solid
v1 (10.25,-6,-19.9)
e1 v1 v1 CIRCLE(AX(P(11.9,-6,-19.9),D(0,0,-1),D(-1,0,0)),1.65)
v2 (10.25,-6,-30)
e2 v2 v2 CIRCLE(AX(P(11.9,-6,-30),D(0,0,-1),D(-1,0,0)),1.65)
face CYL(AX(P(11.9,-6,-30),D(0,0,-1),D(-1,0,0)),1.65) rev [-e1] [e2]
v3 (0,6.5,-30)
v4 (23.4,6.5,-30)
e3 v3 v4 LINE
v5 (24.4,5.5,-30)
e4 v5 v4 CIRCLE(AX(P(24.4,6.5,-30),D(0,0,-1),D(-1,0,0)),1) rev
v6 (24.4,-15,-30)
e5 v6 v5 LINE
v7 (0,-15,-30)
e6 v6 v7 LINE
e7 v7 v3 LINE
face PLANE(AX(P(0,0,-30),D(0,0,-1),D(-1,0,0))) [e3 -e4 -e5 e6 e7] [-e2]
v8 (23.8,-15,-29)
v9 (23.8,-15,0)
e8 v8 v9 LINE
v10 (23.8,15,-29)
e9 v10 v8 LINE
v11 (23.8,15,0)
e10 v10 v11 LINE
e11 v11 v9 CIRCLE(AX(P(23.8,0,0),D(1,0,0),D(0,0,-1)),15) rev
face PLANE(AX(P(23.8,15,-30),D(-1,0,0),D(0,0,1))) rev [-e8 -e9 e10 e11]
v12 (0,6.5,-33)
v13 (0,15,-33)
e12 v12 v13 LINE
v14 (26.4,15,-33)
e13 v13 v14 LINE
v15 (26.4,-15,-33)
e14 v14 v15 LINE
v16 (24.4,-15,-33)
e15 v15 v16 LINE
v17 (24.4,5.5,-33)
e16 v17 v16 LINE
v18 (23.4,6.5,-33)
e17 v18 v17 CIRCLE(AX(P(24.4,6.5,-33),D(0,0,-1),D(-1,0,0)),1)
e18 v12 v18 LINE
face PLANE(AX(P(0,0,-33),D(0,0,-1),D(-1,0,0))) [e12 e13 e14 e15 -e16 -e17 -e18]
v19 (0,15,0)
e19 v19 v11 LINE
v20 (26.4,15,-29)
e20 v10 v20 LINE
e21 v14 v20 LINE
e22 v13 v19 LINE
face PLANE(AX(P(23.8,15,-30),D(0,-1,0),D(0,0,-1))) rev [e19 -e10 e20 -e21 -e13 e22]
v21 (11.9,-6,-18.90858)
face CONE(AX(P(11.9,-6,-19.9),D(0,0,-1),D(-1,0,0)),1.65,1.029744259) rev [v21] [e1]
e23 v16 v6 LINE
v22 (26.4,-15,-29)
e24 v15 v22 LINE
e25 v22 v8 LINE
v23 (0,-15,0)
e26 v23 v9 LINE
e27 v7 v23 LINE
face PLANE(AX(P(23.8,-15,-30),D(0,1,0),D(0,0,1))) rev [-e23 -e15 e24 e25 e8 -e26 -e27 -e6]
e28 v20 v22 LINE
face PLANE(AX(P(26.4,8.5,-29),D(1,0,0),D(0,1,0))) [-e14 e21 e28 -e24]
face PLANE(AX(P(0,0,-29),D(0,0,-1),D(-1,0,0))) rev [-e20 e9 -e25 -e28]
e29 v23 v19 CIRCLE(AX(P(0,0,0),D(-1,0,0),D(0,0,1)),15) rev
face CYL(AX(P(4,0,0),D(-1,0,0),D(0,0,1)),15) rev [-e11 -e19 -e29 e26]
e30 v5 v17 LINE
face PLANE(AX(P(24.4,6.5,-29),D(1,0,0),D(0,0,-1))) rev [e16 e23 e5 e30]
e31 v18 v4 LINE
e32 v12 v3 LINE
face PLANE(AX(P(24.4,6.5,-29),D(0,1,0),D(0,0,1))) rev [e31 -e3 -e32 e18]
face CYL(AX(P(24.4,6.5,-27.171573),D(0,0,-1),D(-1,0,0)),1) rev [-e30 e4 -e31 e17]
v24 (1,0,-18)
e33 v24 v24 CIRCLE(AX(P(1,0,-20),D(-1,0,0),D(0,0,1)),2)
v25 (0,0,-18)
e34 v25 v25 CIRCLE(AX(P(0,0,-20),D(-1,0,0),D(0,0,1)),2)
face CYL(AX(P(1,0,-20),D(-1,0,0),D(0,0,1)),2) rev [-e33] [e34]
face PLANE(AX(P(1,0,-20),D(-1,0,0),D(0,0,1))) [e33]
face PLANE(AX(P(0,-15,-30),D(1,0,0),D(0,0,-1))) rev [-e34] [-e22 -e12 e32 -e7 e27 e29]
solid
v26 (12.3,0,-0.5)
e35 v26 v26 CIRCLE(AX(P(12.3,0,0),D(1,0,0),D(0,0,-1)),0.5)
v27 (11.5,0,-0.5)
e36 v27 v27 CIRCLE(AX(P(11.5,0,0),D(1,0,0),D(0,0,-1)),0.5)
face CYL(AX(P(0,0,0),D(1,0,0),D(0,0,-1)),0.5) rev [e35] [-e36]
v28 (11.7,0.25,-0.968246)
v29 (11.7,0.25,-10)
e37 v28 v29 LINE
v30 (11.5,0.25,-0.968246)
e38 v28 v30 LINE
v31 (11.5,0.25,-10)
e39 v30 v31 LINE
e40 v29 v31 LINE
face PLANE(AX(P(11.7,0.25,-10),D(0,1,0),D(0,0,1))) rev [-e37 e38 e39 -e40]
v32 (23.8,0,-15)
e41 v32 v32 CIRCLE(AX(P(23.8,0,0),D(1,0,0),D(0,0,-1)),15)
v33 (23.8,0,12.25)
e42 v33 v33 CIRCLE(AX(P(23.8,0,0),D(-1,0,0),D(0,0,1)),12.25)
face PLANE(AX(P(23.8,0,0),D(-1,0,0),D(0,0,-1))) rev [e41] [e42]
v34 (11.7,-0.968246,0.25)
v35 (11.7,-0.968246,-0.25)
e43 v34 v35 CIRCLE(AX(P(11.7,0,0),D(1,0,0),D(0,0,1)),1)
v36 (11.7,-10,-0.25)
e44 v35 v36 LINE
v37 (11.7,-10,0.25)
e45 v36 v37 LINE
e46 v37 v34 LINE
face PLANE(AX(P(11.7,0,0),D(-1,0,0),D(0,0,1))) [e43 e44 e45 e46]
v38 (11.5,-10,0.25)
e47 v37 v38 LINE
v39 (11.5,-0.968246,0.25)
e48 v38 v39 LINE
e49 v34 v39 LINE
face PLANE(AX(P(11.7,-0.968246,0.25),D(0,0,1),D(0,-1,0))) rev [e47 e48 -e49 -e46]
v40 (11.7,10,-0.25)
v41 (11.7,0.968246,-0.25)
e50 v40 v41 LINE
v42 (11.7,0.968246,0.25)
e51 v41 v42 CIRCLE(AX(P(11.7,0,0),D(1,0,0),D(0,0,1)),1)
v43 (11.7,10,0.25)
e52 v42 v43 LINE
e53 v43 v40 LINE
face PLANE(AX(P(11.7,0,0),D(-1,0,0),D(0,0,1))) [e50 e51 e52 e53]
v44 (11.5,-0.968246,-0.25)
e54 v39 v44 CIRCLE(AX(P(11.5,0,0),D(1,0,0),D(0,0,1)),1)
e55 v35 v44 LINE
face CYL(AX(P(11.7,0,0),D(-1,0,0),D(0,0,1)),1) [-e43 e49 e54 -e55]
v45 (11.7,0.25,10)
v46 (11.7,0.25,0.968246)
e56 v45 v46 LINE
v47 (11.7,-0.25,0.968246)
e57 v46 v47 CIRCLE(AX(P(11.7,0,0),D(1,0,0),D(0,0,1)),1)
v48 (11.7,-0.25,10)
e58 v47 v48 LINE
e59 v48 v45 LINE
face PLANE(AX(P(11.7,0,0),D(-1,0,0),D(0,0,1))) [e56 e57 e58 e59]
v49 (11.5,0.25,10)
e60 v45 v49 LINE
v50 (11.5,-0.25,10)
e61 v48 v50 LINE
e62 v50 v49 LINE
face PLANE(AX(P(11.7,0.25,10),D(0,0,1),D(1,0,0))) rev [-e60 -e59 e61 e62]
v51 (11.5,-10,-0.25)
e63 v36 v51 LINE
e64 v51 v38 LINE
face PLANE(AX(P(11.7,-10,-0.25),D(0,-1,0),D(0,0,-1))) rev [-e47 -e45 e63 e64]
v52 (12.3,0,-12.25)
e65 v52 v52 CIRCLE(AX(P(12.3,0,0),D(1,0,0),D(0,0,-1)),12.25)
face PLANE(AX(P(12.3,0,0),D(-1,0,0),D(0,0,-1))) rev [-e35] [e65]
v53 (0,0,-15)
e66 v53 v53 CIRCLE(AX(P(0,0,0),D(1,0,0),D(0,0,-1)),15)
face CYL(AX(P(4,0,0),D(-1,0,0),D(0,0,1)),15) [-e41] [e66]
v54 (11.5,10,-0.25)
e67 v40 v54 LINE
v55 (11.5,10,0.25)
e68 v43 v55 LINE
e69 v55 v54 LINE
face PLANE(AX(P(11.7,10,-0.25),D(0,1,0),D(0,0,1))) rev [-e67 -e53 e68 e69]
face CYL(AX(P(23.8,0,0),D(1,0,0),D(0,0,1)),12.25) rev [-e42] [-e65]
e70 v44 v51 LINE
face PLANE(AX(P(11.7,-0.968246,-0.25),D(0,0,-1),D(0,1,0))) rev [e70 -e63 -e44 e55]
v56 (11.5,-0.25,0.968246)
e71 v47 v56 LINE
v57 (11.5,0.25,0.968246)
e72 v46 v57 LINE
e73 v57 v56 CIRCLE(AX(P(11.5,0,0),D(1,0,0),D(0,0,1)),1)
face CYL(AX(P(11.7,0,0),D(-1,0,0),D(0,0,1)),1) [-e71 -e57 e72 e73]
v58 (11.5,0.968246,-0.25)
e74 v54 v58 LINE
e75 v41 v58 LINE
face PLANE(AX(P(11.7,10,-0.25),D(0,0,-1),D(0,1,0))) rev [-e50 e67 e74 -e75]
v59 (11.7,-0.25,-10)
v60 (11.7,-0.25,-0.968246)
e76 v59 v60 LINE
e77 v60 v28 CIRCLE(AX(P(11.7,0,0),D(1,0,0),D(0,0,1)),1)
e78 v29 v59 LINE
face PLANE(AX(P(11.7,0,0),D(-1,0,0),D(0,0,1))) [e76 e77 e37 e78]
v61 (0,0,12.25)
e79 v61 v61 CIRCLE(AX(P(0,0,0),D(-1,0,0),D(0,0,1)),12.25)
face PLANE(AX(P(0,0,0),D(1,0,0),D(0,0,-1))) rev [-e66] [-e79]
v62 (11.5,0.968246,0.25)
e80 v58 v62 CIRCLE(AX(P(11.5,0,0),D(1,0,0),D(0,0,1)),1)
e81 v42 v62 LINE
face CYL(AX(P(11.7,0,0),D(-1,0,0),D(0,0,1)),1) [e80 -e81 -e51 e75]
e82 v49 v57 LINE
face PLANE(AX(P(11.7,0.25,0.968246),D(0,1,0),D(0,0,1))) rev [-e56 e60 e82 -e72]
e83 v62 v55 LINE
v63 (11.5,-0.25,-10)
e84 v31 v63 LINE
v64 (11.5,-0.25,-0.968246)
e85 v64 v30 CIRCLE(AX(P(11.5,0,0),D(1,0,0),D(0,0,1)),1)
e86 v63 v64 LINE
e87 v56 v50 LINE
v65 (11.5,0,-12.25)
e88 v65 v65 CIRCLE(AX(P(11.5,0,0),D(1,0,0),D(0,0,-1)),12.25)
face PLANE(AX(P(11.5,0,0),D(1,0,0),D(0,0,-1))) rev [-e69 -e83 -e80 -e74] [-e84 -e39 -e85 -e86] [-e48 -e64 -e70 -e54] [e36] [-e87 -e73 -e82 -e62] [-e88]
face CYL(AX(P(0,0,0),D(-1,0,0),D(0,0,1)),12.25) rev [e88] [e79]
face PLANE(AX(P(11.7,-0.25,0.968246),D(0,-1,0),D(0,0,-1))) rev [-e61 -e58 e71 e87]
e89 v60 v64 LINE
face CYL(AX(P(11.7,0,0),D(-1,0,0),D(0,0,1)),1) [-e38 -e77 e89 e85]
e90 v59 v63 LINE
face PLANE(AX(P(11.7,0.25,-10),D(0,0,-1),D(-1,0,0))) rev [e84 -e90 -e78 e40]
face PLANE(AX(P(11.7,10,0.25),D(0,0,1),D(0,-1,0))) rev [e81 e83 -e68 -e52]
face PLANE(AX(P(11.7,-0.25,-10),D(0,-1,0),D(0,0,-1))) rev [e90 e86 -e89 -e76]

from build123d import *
from build123d.topology import SkipClean

# Parameters (mm, degrees)
SKETCH_1_R                       = 15
EXTRUDE_1_DEPTH                  = 4
M27X2_0_1_D                      = 24.5
SKETCH_5_R                       = 15
SKETCH_5_R_2                     = 12.25
EXTRUDE_2_DEPTH                  = 7.5
SKETCH_6_R                       = 15
EXTRUDE_3_DEPTH                  = 0.4
MIRROR_START                     = 11.9
MIRROR_1_OUTLINE_R               = 15
MIRROR_1_OUTLINE_R_2             = 12.25
MIRROR_1_DEPTH                   = 11.9
MIRROR_1_2_OUTLINE_R             = 12.25
MIRROR_1_2_DEPTH                 = 0.4
SKETCH_7_R                       = 0.5
CUT_EXTRUDE_2_DEPTH              = 25.521215304
SKETCH_9_W                       = 23.8
SKETCH_9_H                       = 30
EXTRUDE_4_DEPTH                  = 15
EXTRUDE_4_DIRECTION_2_REACH      = 43.127
EXTRUDE_4_DIRECTION_2_END_RADIUS = 15
SKETCH_19_R                      = 2
CUT_EXTRUDE_8_DEPTH              = 1
EXTRUDE_7_DEPTH                  = 3
EXTRUDE_7_DEPTH_BACK             = 1
SKETCH_10_W                      = 29
SKETCH_10_H                      = 29
SKETCH_10_W_2                    = 25
SKETCH_10_H_2                    = 25
SKETCH_20_R                      = 1
CUT_EXTRUDE_9_DEPTH              = 3
CUT_EXTRUDE_10_DEPTH             = 56.255859418
SKETCH_24_W                      = 2.6
SKETCH_24_H                      = 23.5
EXTRUDE_8_DEPTH                  = 1
SKETCH_25_W                      = 26.4
SKETCH_25_H                      = 6.5
EXTRUDE_9_DEPTH                  = 4
CUT_EXTRUDE_11_DEPTH             = 0.2


# Read off the part's stored shape, not the designer's step: 镜向1
with BuildPart() as part:
    # 草图1 → 凸台-拉伸1 (new body)
    with BuildSketch(Plane(origin=(0, 0, 0), x_dir=(0, 0, -1), z_dir=(1, 0, 0))):
        Circle(SKETCH_1_R)
    extrude(amount=EXTRUDE_1_DEPTH)

    # M27x2.0 螺纹孔1 (through all)
    with Locations(Plane.ZY):
        with Locations((0, 0)):
            Hole(M27X2_0_1_D / 2)

    # 草图5 → 凸台-拉伸2 (add)
    with SkipClean():  # the faces are left unmerged after this step: merging them gives an invalid solid
        with BuildSketch(Plane(origin=(4, 0, 0), x_dir=(0, 0, -1), z_dir=(1, 0, 0))):
            Circle(SKETCH_5_R)
            with Locations(Location((0, 0, 0), (0, 0, 180))):
                Circle(SKETCH_5_R_2, mode=Mode.SUBTRACT)
        extrude(amount=EXTRUDE_2_DEPTH)
    add(part.part.scale(1), mode=Mode.REPLACE)  # the faces are merged on a copy

    # 草图6 → 凸台-拉伸3 (add)
    with BuildSketch(Plane(origin=(11.5, 0, 0), x_dir=(0, 0, -1), z_dir=(1, 0, 0))):
        Circle(SKETCH_6_R)
    extrude(amount=EXTRUDE_3_DEPTH)

    # 镜向1 outline → 镜向1 (add)
    with BuildSketch(Plane.YZ.offset(MIRROR_START)):
        Circle(MIRROR_1_OUTLINE_R)
        Circle(MIRROR_1_OUTLINE_R_2, mode=Mode.SUBTRACT)
    extrude(amount=MIRROR_1_DEPTH)

    # Mirror 1 2 outline → Mirror 1 2 (add)
    with BuildSketch(Plane.YZ.offset(MIRROR_START)):
        Circle(MIRROR_1_2_OUTLINE_R)
    extrude(amount=MIRROR_1_2_DEPTH)

    # 草图7 → 切除-拉伸2 (cut, through all)
    with BuildSketch(Plane(origin=(12.3, 0, 0), x_dir=(0, 0, -1), z_dir=(1, 0, 0))):
        Circle(SKETCH_7_R)
    extrude(amount=-CUT_EXTRUDE_2_DEPTH, mode=Mode.SUBTRACT)

    # 草图26 → 切除-拉伸11 (cut)
    with BuildSketch(Plane.ZY.offset(-11.5)):
        with BuildLine():
            Line((-10, 0.25), (-0.968245837, 0.25))
            ThreePointArc((-0.968245837, 0.25), (-1, 0), (-0.968245837, -0.25))
            Line((-0.968245837, -0.25), (-10, -0.25))
            Line((-10, -0.25), (-10, 0.25))
        make_face()
        with BuildLine():
            Line((10, 0.25), (10, -0.25))
            Line((10, -0.25), (0.968245837, -0.25))
            ThreePointArc((0.968245837, -0.25), (1, 0), (0.968245837, 0.25))
            Line((0.968245837, 0.25), (10, 0.25))
        make_face()
        with BuildLine():
            Line((-0.25, 10), (0.25, 10))
            Line((0.25, 10), (0.25, 0.968245837))
            ThreePointArc((0.25, 0.968245837), (0, 1), (-0.25, 0.968245837))
            Line((-0.25, 0.968245837), (-0.25, 10))
        make_face()
        with BuildLine():
            Line((-0.25, -10), (0.25, -10))
            Line((0.25, -10), (0.25, -0.968245837))
            ThreePointArc((0.25, -0.968245837), (0, -1), (-0.25, -0.968245837))
            Line((-0.25, -0.968245837), (-0.25, -10))
        make_face()
    extrude(amount=-CUT_EXTRUDE_11_DEPTH, mode=Mode.SUBTRACT)


with BuildPart() as body_2:
    # 草图9 → 凸台-拉伸4 (new body)
    with BuildSketch(Plane(origin=(0, 0, -15), x_dir=(-1, 0, 0), z_dir=(0, 0, -1))):
        with Locations((-11.9, 0)):
            Rectangle(SKETCH_9_W, SKETCH_9_H)
    extrude(amount=EXTRUDE_4_DEPTH)

    # 凸台-拉伸4 direction 2: up to this cylinder (the profile starts outside it)
    extrude_4_direction_2_end = Plane(origin=(11.9, 0, 0), z_dir=(-1, 0, 0)) * Cylinder(EXTRUDE_4_DIRECTION_2_END_RADIUS, 117.254, mode=Mode.PRIVATE)
    # 草图9 → 凸台-拉伸4 direction 2 (add, up to the surface)
    with BuildSketch(Plane(origin=(0, 0, -15), x_dir=(-1, 0, 0), z_dir=(0, 0, -1)), mode=Mode.PRIVATE) as extrude_4_direction_2_sk1:
        with Locations((-11.9, 0)):
            Rectangle(SKETCH_9_W, SKETCH_9_H)
    extrude_4_direction_2_tool1 = extrude(extrude_4_direction_2_sk1.sketch, amount=-EXTRUDE_4_DIRECTION_2_REACH, mode=Mode.PRIVATE) - extrude_4_direction_2_end
    add(extrude_4_direction_2_tool1.solids().sort_by_distance((11.9, 0, -15))[0])
    add(extrude_4_direction_2_tool1.solids().sort_by_distance((11.9, 0, -15))[1])

    # 草图19 → 切除-拉伸8 (cut)
    with BuildSketch(Plane.ZY):
        with Locations((-20, 0)):
            Circle(SKETCH_19_R)
    extrude(amount=-CUT_EXTRUDE_8_DEPTH, mode=Mode.SUBTRACT)

    # 草图10 → 凸台-拉伸7 (add, two sides: drawn at the far end of the back side and taken through both)
    with BuildSketch(Plane(origin=(0, 0, -30), x_dir=(-1, 0, 0), z_dir=(0, 0, -1)).offset(-EXTRUDE_7_DEPTH_BACK)):
        with Locations((-11.9, -6)):
            Rectangle(SKETCH_10_W, SKETCH_10_H)
        with Locations((-11.9, -6)):
            Rectangle(SKETCH_10_W_2, SKETCH_10_H_2, mode=Mode.SUBTRACT)
    extrude(amount=EXTRUDE_7_DEPTH + EXTRUDE_7_DEPTH_BACK)

    # 草图20 → 切除-拉伸9 (cut)
    with BuildSketch(Plane(origin=(0, 0, -33), x_dir=(-1, 0, 0), z_dir=(0, 0, -1))):
        with Locations((-24.4, 6.5)):
            Circle(SKETCH_20_R)
    extrude(amount=-CUT_EXTRUDE_9_DEPTH, mode=Mode.SUBTRACT)

    # 草图22 → M4 螺纹孔2 (revolve, cut)
    with BuildSketch(Plane(origin=(11.9, -6, -30), x_dir=(0, 1, 0), z_dir=(1, 0, 0))):
        Polygon((0, 0), (0, 11.091420021), (1.65, 10.1), (1.65, 0), align=None)
    revolve(axis=Axis((11.9, -6, -36.35), (0, 0, 1)), mode=Mode.SUBTRACT)

    # 草图23 → 切除-拉伸10 (cut, through all)
    with BuildSketch(Plane.XY.offset(-29)):
        Polygon((24.4, -15), (26.4, -15), (26.4, -20.5), (-2.6, -20.5), (-2.6, 8.5), (0, 8.5), (0, 6.5), (-0.6, 6.5), (-0.6, -18.5), (24.4, -18.5), align=None)
    extrude(amount=-CUT_EXTRUDE_10_DEPTH, mode=Mode.SUBTRACT)

    # 草图24 → 凸台-拉伸8 (add)
    with BuildSketch(Plane.XY.offset(-29)):
        with Locations((25.1, -3.25)):
            Rectangle(SKETCH_24_W, SKETCH_24_H)
    extrude(amount=-EXTRUDE_8_DEPTH)

    # 草图25 → 凸台-拉伸9 (add)
    with BuildSketch(Plane(origin=(0, 0, -29), x_dir=(-1, 0, 0), z_dir=(0, 0, -1))):
        with Locations((-13.2, 11.75)):
            Rectangle(SKETCH_25_W, SKETCH_25_H)
    extrude(amount=EXTRUDE_9_DEPTH)


solid = Compound([part.part, body_2.part])
